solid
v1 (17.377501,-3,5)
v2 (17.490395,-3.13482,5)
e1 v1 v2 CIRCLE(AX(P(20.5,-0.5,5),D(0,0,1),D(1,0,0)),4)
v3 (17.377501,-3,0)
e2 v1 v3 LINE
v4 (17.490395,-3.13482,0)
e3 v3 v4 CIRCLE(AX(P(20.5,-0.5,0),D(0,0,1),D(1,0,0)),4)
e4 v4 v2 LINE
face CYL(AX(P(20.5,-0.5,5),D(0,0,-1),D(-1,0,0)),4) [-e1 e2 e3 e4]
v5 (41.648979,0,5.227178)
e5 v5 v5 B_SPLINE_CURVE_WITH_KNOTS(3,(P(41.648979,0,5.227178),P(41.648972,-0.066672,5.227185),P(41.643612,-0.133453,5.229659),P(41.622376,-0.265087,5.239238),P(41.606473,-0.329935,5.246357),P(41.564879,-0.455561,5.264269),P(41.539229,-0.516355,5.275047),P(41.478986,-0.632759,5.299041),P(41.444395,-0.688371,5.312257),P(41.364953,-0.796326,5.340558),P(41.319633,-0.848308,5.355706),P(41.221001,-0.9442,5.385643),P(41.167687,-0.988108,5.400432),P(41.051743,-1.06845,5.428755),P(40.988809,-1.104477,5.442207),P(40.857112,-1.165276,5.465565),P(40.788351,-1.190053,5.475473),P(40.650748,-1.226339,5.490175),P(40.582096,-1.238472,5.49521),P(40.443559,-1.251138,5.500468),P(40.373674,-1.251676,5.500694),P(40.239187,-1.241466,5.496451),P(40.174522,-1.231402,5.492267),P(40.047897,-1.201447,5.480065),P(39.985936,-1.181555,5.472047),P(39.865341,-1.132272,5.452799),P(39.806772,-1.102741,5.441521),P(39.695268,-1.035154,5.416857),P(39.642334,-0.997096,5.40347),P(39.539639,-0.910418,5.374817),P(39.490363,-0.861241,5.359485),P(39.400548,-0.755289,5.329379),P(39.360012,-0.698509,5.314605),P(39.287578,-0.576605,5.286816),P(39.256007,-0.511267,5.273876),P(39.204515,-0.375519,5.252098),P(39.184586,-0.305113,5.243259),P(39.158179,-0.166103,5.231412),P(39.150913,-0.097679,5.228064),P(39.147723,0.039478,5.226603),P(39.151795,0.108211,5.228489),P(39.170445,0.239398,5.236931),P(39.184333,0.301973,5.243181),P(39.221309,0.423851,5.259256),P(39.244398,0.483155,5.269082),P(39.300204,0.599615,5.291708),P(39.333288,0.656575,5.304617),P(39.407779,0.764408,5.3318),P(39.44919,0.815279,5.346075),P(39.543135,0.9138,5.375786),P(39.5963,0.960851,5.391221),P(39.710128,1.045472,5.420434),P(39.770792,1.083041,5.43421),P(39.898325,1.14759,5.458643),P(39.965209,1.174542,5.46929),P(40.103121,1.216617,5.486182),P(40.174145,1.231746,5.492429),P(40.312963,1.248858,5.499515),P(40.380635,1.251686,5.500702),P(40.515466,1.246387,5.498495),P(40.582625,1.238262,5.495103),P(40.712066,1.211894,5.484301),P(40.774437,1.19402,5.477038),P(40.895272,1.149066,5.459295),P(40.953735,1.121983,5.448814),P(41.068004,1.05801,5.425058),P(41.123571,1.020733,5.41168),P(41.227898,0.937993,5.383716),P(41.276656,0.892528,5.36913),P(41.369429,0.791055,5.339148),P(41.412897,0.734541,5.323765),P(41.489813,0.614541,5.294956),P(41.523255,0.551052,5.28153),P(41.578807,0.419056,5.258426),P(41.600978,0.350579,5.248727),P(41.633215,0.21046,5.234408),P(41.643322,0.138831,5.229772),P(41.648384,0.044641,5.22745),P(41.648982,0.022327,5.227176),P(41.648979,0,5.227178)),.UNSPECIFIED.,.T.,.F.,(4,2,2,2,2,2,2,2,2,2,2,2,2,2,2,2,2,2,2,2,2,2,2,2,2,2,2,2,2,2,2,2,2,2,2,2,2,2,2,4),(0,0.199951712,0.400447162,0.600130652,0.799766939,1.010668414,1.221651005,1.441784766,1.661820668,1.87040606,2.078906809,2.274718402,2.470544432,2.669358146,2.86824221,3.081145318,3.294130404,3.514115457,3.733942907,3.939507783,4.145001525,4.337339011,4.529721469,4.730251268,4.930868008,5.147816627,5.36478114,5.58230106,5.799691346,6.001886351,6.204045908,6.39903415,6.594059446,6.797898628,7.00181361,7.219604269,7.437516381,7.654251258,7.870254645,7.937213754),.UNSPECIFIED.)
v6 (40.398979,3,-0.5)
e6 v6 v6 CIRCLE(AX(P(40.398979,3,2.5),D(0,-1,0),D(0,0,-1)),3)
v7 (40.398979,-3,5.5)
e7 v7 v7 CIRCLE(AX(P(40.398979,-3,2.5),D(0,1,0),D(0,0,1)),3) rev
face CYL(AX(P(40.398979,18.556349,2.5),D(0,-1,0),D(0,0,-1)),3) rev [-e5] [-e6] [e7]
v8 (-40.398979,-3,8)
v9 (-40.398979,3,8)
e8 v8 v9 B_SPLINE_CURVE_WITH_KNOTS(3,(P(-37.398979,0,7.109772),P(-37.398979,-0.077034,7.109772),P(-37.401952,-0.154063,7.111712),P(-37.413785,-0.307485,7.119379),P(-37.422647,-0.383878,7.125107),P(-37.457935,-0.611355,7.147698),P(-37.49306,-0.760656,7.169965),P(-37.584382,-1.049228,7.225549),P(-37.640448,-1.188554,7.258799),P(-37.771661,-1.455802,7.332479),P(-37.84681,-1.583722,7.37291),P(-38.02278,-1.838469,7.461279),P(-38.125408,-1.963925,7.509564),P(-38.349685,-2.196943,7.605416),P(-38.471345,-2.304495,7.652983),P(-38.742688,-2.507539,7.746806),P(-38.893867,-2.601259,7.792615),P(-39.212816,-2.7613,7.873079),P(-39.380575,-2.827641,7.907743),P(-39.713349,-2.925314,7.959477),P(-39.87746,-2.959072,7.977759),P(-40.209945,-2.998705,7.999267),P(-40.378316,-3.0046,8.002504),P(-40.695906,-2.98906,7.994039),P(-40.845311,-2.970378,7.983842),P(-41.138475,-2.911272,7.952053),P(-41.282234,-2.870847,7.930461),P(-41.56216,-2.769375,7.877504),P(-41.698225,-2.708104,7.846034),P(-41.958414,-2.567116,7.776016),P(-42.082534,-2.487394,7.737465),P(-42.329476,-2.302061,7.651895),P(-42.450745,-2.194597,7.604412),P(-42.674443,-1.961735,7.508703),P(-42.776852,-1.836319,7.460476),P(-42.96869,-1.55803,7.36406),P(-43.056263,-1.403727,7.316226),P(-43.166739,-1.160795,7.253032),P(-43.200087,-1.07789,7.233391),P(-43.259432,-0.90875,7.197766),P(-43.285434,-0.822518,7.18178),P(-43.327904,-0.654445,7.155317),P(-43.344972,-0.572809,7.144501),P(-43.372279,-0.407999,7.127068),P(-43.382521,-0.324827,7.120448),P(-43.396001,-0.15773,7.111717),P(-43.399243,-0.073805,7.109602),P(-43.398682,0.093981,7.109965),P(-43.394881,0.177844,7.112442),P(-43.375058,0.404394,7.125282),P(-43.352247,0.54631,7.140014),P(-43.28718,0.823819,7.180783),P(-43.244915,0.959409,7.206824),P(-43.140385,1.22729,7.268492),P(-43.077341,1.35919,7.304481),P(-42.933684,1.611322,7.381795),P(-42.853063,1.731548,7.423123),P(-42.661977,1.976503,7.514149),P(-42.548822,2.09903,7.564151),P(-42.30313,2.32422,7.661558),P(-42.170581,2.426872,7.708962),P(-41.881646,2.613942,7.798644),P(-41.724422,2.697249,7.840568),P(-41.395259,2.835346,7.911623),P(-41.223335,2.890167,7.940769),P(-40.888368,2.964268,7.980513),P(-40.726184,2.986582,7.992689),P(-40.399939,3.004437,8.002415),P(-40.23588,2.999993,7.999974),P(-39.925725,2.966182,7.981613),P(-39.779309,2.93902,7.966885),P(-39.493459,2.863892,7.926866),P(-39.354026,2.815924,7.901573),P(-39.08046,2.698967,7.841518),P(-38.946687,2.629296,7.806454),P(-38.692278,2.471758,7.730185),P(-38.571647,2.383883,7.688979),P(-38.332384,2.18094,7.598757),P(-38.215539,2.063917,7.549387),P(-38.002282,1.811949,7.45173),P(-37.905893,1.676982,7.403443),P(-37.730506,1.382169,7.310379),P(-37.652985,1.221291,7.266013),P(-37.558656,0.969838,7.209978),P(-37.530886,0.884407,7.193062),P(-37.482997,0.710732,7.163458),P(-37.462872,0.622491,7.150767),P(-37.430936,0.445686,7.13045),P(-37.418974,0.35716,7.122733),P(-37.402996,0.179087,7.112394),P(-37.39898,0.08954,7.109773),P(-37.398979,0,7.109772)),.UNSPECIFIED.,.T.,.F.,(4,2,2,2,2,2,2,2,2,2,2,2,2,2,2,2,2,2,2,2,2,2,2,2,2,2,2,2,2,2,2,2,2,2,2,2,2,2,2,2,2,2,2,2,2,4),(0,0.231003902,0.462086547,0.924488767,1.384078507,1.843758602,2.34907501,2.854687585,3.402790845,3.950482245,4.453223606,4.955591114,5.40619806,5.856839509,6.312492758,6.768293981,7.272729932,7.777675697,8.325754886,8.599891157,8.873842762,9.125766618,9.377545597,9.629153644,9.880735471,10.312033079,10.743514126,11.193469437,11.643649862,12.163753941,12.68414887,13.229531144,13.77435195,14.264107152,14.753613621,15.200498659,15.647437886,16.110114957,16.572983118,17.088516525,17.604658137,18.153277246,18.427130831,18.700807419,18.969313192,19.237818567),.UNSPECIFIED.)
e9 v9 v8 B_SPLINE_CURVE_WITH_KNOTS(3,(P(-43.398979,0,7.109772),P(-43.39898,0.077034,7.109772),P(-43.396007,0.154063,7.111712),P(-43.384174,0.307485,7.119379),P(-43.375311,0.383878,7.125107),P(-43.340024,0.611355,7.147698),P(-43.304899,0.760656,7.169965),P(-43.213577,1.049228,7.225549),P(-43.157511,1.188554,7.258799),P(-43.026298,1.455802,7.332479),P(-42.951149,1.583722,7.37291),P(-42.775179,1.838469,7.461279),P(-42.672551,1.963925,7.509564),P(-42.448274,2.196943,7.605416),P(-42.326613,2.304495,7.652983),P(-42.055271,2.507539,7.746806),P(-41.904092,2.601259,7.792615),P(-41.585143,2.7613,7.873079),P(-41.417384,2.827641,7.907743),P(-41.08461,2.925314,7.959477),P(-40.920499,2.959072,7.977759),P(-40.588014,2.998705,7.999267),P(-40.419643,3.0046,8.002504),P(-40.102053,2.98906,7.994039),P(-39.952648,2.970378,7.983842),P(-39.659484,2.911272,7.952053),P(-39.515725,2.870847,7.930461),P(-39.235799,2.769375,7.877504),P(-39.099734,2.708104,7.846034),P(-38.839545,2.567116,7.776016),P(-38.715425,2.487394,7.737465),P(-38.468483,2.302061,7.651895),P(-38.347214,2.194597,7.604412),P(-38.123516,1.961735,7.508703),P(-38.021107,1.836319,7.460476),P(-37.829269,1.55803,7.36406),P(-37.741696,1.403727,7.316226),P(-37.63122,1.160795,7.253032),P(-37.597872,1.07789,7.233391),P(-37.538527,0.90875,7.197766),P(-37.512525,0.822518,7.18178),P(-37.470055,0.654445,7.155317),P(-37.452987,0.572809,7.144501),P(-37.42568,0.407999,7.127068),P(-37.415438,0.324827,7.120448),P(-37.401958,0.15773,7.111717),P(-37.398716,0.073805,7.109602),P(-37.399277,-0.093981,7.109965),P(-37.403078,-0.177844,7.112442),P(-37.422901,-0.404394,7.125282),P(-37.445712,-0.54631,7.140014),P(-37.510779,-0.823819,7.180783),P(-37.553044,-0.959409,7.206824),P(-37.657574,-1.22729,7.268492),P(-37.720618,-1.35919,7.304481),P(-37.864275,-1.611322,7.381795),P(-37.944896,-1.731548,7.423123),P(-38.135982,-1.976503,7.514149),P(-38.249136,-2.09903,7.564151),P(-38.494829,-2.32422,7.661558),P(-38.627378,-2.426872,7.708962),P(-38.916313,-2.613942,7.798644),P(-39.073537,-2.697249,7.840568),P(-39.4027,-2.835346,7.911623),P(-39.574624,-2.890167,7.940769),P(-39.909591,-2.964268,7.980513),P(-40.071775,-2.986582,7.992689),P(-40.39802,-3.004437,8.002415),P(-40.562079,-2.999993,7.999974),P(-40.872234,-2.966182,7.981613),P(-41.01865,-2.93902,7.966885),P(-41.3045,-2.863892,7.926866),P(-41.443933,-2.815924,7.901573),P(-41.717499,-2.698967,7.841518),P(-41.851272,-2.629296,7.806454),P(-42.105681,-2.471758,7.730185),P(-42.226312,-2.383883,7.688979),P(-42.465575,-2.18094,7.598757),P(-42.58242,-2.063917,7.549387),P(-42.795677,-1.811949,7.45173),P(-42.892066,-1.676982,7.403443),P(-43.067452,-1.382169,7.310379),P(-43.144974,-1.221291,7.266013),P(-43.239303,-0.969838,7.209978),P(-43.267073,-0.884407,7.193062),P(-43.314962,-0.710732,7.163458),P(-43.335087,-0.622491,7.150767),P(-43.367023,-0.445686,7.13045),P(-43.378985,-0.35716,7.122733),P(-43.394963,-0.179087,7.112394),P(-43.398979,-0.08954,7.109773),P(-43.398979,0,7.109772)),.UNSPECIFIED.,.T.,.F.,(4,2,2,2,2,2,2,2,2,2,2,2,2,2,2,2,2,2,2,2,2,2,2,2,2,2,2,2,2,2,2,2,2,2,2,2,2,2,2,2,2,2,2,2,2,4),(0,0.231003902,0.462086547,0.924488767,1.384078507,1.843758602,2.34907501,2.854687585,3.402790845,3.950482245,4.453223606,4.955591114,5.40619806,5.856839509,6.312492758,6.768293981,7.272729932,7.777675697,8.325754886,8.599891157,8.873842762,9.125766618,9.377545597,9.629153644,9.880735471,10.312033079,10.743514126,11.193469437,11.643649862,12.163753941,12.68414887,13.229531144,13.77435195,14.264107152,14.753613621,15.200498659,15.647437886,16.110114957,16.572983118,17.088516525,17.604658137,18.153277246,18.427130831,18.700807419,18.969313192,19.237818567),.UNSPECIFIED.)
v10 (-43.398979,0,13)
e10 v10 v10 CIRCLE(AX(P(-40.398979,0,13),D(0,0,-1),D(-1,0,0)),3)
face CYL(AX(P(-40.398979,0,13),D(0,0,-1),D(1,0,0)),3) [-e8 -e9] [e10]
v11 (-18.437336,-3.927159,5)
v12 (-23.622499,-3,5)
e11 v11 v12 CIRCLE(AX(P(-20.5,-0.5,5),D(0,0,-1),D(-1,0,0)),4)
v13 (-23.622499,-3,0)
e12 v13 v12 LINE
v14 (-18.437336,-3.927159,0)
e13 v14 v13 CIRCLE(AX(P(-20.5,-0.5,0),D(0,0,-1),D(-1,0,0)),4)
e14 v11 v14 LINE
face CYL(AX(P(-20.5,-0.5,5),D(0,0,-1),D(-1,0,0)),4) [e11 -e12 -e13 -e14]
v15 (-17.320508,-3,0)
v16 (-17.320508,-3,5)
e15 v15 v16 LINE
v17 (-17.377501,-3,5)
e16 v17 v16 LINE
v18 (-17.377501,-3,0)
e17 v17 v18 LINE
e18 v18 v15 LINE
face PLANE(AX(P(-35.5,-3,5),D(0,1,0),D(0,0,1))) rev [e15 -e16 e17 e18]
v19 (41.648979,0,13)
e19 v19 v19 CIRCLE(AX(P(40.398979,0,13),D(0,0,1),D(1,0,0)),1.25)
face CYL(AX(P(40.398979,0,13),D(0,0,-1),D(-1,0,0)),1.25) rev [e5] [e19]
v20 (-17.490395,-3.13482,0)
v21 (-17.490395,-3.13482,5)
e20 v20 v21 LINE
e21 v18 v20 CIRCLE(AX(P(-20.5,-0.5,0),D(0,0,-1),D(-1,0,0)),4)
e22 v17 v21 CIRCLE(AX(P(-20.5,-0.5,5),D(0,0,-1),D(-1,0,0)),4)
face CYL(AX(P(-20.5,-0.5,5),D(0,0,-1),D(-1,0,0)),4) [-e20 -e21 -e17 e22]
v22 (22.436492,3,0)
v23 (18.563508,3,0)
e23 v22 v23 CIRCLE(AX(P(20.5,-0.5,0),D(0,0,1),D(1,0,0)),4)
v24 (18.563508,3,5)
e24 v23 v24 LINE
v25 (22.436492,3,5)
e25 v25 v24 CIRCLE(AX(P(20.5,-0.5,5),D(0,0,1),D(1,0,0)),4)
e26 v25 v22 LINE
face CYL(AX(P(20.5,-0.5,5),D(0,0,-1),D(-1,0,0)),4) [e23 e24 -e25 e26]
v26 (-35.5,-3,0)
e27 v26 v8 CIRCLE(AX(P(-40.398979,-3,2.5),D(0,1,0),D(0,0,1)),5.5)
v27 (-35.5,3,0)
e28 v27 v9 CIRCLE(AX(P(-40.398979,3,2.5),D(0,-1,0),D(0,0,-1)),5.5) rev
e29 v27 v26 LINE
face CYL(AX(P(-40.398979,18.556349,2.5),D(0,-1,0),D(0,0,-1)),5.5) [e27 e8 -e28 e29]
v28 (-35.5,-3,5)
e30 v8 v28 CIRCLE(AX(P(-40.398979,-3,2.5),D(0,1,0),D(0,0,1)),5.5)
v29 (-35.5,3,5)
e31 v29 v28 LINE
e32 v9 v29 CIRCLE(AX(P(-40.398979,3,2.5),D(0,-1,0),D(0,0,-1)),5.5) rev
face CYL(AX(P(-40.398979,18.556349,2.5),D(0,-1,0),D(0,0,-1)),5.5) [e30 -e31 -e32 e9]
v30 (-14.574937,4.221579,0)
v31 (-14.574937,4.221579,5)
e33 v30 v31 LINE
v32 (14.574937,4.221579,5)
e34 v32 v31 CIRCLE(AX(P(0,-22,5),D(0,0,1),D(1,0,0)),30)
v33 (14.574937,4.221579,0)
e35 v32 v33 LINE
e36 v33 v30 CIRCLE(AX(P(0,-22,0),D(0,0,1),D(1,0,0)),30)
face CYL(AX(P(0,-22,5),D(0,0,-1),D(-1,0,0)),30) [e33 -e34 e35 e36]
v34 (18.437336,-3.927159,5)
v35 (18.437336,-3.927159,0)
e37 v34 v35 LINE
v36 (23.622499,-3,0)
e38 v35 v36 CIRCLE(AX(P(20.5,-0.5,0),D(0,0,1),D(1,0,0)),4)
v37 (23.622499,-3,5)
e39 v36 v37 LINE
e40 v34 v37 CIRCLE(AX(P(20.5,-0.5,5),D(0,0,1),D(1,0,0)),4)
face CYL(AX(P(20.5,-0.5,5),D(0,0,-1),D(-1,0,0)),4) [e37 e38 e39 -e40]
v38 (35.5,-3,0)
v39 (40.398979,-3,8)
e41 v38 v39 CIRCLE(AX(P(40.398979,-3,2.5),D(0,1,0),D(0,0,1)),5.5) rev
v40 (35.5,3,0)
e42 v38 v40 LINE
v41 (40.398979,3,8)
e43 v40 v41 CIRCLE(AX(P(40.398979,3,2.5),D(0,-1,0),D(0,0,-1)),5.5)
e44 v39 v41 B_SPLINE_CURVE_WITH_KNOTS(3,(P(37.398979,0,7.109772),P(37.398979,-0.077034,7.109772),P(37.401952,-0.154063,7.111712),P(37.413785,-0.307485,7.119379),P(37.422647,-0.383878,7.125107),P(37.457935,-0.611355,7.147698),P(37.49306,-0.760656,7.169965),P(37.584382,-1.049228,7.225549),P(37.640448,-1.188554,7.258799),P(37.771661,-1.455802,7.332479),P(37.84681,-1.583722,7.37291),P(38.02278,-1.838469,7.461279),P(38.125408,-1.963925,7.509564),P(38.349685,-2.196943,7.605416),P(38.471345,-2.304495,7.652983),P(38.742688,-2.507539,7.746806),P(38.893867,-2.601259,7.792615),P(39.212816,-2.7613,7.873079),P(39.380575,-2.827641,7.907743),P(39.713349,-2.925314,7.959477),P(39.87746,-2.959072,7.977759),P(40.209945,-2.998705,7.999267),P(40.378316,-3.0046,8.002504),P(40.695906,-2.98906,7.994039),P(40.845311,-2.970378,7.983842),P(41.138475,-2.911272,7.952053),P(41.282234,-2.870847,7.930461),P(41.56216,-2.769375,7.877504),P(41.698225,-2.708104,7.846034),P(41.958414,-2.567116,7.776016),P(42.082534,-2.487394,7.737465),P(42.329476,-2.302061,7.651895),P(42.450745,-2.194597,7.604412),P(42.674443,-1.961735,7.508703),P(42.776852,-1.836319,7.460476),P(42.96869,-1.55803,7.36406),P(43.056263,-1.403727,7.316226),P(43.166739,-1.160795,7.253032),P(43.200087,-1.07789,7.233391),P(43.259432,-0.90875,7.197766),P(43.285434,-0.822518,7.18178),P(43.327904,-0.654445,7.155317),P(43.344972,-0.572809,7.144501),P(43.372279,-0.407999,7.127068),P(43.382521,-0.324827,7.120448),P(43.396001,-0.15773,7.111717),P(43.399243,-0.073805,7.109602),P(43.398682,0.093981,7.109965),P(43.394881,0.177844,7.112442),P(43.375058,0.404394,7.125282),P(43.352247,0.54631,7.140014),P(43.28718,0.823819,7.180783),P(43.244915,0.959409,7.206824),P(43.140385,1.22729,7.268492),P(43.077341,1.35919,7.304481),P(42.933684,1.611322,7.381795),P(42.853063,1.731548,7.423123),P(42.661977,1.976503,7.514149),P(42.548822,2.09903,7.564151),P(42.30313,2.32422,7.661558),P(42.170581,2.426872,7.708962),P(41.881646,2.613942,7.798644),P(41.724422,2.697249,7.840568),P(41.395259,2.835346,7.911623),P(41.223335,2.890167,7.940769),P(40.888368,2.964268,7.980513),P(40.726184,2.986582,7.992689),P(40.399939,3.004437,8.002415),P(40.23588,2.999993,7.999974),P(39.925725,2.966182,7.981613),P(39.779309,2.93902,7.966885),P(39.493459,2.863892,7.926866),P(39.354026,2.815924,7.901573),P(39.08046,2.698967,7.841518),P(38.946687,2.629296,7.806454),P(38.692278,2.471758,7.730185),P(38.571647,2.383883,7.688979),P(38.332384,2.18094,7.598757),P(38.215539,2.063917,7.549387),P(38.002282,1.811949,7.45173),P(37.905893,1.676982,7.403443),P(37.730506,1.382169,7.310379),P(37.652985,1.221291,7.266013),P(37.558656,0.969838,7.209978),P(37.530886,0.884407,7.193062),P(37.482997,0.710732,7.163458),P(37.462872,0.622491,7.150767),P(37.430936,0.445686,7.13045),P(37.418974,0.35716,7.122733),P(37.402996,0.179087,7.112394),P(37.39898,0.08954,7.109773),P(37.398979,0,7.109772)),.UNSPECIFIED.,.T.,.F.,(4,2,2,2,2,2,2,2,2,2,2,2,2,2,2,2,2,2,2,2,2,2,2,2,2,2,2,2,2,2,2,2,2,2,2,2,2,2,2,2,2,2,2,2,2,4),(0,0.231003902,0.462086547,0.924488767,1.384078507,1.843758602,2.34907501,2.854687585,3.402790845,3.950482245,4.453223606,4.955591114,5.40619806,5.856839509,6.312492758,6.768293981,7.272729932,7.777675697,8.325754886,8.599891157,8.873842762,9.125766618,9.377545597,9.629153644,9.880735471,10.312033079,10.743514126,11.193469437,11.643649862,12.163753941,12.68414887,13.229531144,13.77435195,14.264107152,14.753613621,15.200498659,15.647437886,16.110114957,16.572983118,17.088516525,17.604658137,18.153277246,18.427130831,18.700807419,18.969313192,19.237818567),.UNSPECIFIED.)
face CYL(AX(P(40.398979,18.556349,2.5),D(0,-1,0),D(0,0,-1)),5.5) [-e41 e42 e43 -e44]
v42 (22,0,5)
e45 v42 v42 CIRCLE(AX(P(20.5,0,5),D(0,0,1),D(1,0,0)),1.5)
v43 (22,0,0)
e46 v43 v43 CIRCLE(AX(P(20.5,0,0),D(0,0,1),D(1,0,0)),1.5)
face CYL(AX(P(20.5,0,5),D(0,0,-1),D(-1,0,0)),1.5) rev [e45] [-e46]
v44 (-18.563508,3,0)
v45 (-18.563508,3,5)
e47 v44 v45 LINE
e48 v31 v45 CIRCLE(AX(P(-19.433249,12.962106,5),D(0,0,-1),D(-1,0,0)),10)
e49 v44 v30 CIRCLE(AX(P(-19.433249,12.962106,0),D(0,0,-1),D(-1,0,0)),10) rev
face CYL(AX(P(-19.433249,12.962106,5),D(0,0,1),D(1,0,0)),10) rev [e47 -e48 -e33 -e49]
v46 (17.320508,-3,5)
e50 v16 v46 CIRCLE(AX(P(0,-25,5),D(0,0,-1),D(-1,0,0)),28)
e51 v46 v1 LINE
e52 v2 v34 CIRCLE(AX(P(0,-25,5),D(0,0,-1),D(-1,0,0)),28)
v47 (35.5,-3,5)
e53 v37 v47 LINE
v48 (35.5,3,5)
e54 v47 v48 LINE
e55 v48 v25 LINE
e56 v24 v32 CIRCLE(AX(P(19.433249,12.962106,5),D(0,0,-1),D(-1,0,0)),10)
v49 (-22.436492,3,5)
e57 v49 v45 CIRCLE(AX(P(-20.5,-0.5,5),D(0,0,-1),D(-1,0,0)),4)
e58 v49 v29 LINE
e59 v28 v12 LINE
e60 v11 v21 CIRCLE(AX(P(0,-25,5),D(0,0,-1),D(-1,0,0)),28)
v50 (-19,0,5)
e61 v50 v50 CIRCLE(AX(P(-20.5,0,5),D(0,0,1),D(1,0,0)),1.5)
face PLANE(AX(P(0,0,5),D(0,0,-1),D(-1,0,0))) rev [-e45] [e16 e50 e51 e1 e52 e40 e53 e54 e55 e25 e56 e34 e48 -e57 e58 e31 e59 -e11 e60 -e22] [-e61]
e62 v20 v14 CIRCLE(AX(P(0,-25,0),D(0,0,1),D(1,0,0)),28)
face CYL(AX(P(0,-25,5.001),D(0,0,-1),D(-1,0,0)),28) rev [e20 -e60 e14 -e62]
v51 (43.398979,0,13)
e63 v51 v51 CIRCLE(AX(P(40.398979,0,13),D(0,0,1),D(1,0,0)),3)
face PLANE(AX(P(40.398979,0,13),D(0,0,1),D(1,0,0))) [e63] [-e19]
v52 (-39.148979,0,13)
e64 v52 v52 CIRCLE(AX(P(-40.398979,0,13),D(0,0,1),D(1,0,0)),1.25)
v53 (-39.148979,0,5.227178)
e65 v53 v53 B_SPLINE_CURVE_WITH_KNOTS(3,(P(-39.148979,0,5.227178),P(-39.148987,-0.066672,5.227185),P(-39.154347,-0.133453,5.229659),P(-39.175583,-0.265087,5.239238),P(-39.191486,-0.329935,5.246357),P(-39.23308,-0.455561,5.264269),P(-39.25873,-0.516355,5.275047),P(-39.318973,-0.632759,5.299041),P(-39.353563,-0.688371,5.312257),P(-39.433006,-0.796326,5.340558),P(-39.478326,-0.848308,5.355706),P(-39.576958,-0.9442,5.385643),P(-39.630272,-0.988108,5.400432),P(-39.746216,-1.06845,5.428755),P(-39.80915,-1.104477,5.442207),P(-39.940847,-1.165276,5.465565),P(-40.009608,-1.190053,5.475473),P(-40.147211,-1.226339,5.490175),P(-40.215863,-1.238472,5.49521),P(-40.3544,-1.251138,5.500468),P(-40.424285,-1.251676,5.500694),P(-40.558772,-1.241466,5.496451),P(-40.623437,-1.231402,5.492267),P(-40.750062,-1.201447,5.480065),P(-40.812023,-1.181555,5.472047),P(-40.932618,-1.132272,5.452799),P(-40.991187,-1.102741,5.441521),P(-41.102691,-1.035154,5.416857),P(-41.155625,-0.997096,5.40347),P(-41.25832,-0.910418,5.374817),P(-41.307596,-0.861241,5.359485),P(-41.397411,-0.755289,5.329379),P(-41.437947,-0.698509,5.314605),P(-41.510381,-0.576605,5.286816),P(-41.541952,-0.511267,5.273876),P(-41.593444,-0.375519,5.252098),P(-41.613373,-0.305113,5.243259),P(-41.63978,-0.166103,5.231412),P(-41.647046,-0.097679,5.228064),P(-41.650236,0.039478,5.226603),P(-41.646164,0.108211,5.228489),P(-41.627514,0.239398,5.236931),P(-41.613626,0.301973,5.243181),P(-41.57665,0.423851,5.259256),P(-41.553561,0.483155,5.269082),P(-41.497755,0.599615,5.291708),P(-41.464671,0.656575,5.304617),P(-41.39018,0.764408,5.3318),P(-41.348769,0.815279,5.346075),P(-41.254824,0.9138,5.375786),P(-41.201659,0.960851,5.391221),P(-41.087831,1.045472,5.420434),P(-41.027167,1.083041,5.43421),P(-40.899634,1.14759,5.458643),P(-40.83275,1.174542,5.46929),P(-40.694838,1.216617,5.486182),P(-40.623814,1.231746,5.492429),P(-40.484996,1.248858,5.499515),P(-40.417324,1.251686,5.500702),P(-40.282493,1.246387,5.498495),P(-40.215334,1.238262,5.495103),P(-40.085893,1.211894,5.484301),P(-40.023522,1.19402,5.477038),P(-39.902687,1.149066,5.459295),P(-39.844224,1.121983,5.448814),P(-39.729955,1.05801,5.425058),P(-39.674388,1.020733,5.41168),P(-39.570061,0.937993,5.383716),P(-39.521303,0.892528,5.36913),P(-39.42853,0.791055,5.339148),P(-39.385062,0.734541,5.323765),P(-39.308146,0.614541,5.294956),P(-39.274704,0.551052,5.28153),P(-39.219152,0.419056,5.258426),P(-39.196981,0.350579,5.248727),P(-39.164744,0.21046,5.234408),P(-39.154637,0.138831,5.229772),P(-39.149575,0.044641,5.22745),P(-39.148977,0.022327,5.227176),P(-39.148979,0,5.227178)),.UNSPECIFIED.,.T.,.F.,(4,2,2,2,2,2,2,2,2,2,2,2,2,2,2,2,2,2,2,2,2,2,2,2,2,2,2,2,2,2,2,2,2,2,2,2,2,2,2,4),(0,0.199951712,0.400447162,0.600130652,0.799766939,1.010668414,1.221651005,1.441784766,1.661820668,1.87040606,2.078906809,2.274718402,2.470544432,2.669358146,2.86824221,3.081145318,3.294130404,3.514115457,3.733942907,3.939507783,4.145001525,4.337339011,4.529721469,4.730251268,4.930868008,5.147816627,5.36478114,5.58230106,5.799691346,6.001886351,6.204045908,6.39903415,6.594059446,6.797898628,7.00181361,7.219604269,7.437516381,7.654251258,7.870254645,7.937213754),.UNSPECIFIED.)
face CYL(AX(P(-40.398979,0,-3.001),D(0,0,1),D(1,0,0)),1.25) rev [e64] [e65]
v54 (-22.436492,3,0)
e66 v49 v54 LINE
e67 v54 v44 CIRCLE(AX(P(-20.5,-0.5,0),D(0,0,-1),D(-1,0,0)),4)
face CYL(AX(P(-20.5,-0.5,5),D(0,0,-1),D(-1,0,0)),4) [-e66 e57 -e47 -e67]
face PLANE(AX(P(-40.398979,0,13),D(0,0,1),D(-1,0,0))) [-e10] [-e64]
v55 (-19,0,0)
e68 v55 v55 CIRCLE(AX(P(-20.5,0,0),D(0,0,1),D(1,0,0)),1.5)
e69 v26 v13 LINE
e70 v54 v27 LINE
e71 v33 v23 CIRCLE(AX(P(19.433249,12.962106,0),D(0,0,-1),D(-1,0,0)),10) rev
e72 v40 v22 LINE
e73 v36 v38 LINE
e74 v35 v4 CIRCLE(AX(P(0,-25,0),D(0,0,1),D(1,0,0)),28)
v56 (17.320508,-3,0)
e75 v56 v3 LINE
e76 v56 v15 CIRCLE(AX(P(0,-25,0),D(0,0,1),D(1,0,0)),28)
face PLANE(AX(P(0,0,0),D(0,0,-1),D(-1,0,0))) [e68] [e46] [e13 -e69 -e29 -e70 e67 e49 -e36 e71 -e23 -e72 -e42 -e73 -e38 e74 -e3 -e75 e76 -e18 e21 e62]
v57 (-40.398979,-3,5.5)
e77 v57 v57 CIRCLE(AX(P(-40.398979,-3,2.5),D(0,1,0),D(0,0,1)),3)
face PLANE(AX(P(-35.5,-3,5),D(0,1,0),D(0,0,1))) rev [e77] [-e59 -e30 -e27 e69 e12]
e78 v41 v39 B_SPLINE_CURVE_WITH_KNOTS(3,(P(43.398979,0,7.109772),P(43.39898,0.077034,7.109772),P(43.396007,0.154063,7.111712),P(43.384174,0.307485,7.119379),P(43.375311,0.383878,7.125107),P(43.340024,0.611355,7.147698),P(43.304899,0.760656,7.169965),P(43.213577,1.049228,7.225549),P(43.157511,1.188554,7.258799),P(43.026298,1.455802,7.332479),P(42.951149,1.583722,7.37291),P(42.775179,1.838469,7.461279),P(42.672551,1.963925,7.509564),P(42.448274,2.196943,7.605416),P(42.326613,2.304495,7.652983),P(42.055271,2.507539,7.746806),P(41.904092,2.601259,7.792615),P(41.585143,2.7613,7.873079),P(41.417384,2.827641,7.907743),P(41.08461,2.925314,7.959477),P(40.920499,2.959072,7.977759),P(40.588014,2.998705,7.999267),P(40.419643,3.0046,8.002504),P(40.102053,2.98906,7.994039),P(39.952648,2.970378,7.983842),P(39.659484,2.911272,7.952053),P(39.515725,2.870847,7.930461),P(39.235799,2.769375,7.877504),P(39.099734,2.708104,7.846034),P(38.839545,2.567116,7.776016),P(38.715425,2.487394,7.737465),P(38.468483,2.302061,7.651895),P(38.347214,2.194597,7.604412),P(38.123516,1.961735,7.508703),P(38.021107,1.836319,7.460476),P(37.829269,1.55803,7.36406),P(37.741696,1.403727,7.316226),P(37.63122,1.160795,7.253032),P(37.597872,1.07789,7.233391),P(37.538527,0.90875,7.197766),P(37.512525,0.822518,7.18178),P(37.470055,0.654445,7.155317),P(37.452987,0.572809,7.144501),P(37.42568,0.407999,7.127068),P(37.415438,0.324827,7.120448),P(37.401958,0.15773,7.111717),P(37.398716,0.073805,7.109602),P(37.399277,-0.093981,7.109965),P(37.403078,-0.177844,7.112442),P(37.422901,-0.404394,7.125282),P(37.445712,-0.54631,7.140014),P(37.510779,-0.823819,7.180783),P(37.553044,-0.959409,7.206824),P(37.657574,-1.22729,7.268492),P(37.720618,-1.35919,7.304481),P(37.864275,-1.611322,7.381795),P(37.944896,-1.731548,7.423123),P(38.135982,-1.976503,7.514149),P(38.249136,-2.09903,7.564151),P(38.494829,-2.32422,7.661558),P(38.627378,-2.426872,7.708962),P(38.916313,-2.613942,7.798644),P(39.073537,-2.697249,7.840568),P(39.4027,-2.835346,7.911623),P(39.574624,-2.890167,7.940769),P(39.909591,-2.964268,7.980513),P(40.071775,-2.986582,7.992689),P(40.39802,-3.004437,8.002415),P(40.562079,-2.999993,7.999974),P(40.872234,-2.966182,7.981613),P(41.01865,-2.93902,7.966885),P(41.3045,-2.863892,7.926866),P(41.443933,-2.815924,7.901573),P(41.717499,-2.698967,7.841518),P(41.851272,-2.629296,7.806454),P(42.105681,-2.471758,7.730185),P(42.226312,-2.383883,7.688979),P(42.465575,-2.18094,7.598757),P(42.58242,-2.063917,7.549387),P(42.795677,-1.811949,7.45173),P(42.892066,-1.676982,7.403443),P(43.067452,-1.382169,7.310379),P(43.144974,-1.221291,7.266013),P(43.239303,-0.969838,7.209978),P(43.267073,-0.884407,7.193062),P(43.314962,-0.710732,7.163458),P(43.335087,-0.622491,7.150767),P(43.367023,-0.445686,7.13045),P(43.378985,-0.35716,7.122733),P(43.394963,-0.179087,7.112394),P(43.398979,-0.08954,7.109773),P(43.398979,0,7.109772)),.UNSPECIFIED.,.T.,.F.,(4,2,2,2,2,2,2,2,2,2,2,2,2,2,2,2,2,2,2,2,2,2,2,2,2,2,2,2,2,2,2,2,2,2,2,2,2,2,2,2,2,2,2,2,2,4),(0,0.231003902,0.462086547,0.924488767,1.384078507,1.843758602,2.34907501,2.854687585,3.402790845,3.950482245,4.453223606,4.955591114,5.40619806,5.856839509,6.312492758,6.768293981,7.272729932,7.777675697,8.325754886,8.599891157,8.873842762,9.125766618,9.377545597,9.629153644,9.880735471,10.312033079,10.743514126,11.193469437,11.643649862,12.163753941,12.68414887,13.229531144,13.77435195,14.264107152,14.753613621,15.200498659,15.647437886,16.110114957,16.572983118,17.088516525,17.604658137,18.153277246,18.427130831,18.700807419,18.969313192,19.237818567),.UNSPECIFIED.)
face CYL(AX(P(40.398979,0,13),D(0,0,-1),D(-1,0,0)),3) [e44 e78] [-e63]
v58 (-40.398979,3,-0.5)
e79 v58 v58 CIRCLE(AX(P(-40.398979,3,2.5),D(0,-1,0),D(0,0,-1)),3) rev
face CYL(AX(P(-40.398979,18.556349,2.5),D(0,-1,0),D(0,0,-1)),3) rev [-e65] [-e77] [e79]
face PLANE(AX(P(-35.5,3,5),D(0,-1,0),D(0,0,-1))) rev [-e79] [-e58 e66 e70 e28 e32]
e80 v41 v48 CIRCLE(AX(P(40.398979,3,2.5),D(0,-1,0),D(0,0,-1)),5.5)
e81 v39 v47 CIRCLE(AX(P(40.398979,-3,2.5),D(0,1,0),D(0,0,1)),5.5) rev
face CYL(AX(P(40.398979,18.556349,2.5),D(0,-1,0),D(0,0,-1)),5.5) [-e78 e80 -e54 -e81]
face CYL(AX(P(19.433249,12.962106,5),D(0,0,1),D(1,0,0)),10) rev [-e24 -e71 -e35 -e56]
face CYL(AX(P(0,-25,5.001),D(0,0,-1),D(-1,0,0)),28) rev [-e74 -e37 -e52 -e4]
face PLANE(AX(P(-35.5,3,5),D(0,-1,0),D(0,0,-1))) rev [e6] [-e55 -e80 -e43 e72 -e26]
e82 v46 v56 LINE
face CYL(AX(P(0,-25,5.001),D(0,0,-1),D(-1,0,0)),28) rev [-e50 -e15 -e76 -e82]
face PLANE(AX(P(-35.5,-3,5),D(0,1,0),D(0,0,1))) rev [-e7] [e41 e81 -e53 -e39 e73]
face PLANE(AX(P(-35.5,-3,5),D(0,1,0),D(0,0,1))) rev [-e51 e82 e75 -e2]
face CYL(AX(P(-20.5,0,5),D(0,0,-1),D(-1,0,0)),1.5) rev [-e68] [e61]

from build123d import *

# Parameters (mm, degrees)
SKETCH1_W                       = 71
SKETCH1_H                       = 6
BOSS_EXTRUDE1_DEPTH             = 5
SKETCH2_R                       = 1.5
CUT_EXTRUDE1_DEPTH              = 36.975686234
SKETCH3_R                       = 4
SKETCH3_R_2                     = 1.5
BOSS_EXTRUDE2_DEPTH             = 5
BOSS_EXTRUDE4_DEPTH             = 5
SKETCH5_R                       = 28
CUT_EXTRUDE3_DEPTH              = 5
FILLET1_R                       = 10
BOSS_EXTRUDE5_REACH             = 38.732
SKETCH6_R                       = 5.5
SKETCH6_R_2                     = 3
BOSS_EXTRUDE5_DIRECTION_2_REACH = 38.732
BOSS_EXTRUDE6_START             = -0.890228
SKETCH7_R                       = 3
SKETCH7_R_2                     = 1.25
BOSS_EXTRUDE6_DEPTH             = 5.890228
CUT_EXTRUDE4_START              = -5
SKETCH8_R                       = 1.25
CUT_EXTRUDE4_DEPTH              = 5
MIRROR7_OUTLINE_W               = 3
MIRROR7_OUTLINE_H               = 5.890504749
CUT_EXTRUDE5_REACH              = 51.262
CUT_EXTRUDE5_END_RADIUS         = 3
SKETCH9_R                       = 1.25


# Read off the part's stored shape, not the designer's step: Mirror7
with BuildPart() as part:
    # Sketch1 → Boss-Extrude1 (new body)
    with BuildSketch(Plane.XY):
        Rectangle(SKETCH1_W, SKETCH1_H)
    extrude(amount=BOSS_EXTRUDE1_DEPTH)

    # Sketch2 → Cut-Extrude1 (cut, through all)
    with BuildSketch(Plane.XY):
        with Locations((20.5, 0)):
            Circle(SKETCH2_R)
        with Locations((-20.5, 0)):
            Circle(SKETCH2_R)
    extrude(amount=CUT_EXTRUDE1_DEPTH, mode=Mode.SUBTRACT)

    # Sketch3 → Boss-Extrude2 (add)
    with BuildSketch(Plane.XY):
        with Locations((20.5, -0.5)):
            Circle(SKETCH3_R)
        with Locations((20.5, 0)):
            Circle(SKETCH3_R_2, mode=Mode.SUBTRACT)
    boss_extrude2 = extrude(amount=BOSS_EXTRUDE2_DEPTH)

    # Mirror1: Boss-Extrude2 across plane
    add(boss_extrude2.mirror(Plane(origin=(0, 0, 0), x_dir=(0, 0, 1), z_dir=(1, 0, 0))))

    # Sketch4 → Boss-Extrude4 (add)
    with BuildSketch(Plane.XY):
        with BuildLine():
            Line((16.583123952, 3), (-16.583123952, 3))
            ThreePointArc((-16.583123952, 3), (0, 8), (16.583123952, 3))
        make_face()
    extrude(amount=BOSS_EXTRUDE4_DEPTH)

    # Sketch5 → Cut-Extrude3 (cut)
    with BuildSketch(Plane.XY):
        with Locations((0, -25)):
            Circle(SKETCH5_R)
    extrude(amount=CUT_EXTRUDE3_DEPTH, mode=Mode.SUBTRACT)

    # Fillet1
    # the kernel refuses this fillet: 10 mm, written as the material it adds along each edge
    with BuildSketch(Plane(origin=(-16.583123952, 3, 0), x_dir=(-1, 0, 0), z_dir=(0, 0, 1))) as fillet1_piece_1:
        with BuildLine():
            CenterArc((2.85012487, -9.962105775), FILLET1_R, 94.989550063, 24.077396017)
            Line((-2.008187335, -1.221579331), (-2.105353579, -1.046768802))
            ThreePointArc((-2.105353579, -1.046768802), (-1.096064984, -0.459595529), (-0.11055416, 0.166666667))
            Line((-0.11055416, 0.166666667), (0, 0.2))
            ThreePointArc((0, 0.2), (0.990192188, 0.2), (1.962989565, 0.199242115))
            Line((1.962989565, 0.199242115), (1.980384375, 0))
        make_face()
    extrude(amount=5)
    with BuildSketch(Plane(origin=(16.583123952, 3, 0), x_dir=(-0.8543488432646742, 0.5196999653764787, 0), z_dir=(0, 0, 1))) as fillet1_piece_2:
        with BuildLine():
            CenterArc((2.74230514, -9.992323342), FILLET1_R, 92.245181841, 24.077396017)
            Line((-1.6919391, -1.029205691), (-1.780623985, -0.849943338))
            ThreePointArc((-1.780623985, -0.849943338), (-0.949909543, -0.343733077), (-0.103939993, 0.170869769))
            Line((-0.103939993, 0.170869769), (0.007835158, 0.199846467))
            ThreePointArc((0.007835158, 0.199846467), (1.175273632, 0.176970025), (2.342712105, 0.199846467))
            Line((2.342712105, 0.199846467), (2.350547263, 0))
        make_face()
    extrude(amount=5)

    # Boss-Extrude5: up to this face of the body (flat: up to its plane)
    boss_extrude5_end = Plane(part.part.faces().sort_by_distance((28.968245837, 3, 2.5))[0])
    # Sketch6 → Boss-Extrude5 (add, up to the picked face)
    with BuildSketch(Plane(origin=(0, 0, 0), x_dir=(1, 0, 0), z_dir=(0, 1, 0)), mode=Mode.PRIVATE) as boss_extrude5_sk1:
        with Locations((40.398979486, -2.5)):
            Circle(SKETCH6_R)
        with Locations(Location((40.398979486, -2.5, 0), (0, 0, 90))):
            Circle(SKETCH6_R_2, mode=Mode.SUBTRACT)
    boss_extrude5_tool1 = split(extrude(boss_extrude5_sk1.sketch, amount=BOSS_EXTRUDE5_REACH, mode=Mode.PRIVATE), bisect_by=boss_extrude5_end, keep=Keep.BOTH, mode=Mode.PRIVATE)
    boss_extrude5 = boss_extrude5_tool1.solids().sort_by(Axis((35.054543, 0, 2.5), (0, 1, 0)))[0]
    add(boss_extrude5)

    # Boss-Extrude5 direction 2: up to this face of the body (flat: up to its plane)
    boss_extrude5_direction_2_end = Plane(part.part.faces().sort_by_distance((29.5612495, -3, 2.5))[0])
    # Sketch6 → Boss-Extrude5 direction 2 (add, up to the picked face)
    with BuildSketch(Plane(origin=(0, 0, 0), x_dir=(1, 0, 0), z_dir=(0, 1, 0)), mode=Mode.PRIVATE) as boss_extrude5_direction_2_sk1:
        with Locations((40.398979486, -2.5)):
            Circle(SKETCH6_R)
        with Locations(Location((40.398979486, -2.5, 0), (0, 0, 90))):
            Circle(SKETCH6_R_2, mode=Mode.SUBTRACT)
    boss_extrude5_direction_2_tool1 = split(extrude(boss_extrude5_direction_2_sk1.sketch, amount=-BOSS_EXTRUDE5_DIRECTION_2_REACH, mode=Mode.PRIVATE), bisect_by=boss_extrude5_direction_2_end, keep=Keep.BOTH, mode=Mode.PRIVATE)
    boss_extrude5_direction_2 = boss_extrude5_direction_2_tool1.solids().sort_by(Axis((35.054543, 0, 2.5), (0, -1, 0)))[0]
    add(boss_extrude5_direction_2)

    # Sketch7 → Boss-Extrude6 (add)
    with BuildSketch(Plane.XY.offset(8).offset(BOSS_EXTRUDE6_START)):
        with Locations(Location((40.398979486, 0, 0), (0, 0, 269.999999959))):
            Circle(SKETCH7_R)
        with Locations((40.398979486, 0)):
            Circle(SKETCH7_R_2, mode=Mode.SUBTRACT)
    extrude(amount=BOSS_EXTRUDE6_DEPTH)

    # Sketch8 → Cut-Extrude4 (cut)
    with BuildSketch(Plane.XY.offset(8).offset(CUT_EXTRUDE4_START)):
        with Locations((40.398979486, 0)):
            Circle(SKETCH8_R)
    extrude(amount=CUT_EXTRUDE4_DEPTH, mode=Mode.SUBTRACT)

    # Mirror5: Boss-Extrude5, Boss-Extrude5 direction 2 across plane
    add(boss_extrude5.mirror(Plane(origin=(0, 0, 0), x_dir=(0, 0, 1), z_dir=(1, 0, 0))))
    add(boss_extrude5_direction_2.mirror(Plane(origin=(0, 0, 0), x_dir=(0, 0, 1), z_dir=(1, 0, 0))))

    # Mirror7 outline → Mirror7 (revolve)
    with BuildSketch(Plane(origin=(-40.398979486, 0, 0), x_dir=(1, 0, 0), z_dir=(0, -1, 0))):
        with Locations((1.5, 10.054747625)):
            Rectangle(MIRROR7_OUTLINE_W, MIRROR7_OUTLINE_H)
    revolve(axis=Axis((-40.398979486, 0, 0), (0, 0, 1)))

    # Cut-Extrude5: up to this cylinder (the profile starts outside it)
    cut_extrude5_end = Plane(origin=(-40.398979486, 0, 2.5), z_dir=(0, -1, 0)) * Cylinder(CUT_EXTRUDE5_END_RADIUS, 109.524, mode=Mode.PRIVATE)
    # Sketch9 → Cut-Extrude5 (cut, up to the surface)
    with BuildSketch(Plane.XY.offset(13), mode=Mode.PRIVATE) as cut_extrude5_sk1:
        with Locations((-40.398979486, 0)):
            Circle(SKETCH9_R)
    cut_extrude5_tool1 = extrude(cut_extrude5_sk1.sketch, amount=-CUT_EXTRUDE5_REACH, mode=Mode.PRIVATE) - cut_extrude5_end
    add(cut_extrude5_tool1.solids().sort_by_distance((-40.398979, 0, 13))[0], mode=Mode.SUBTRACT)


solid = part.part
